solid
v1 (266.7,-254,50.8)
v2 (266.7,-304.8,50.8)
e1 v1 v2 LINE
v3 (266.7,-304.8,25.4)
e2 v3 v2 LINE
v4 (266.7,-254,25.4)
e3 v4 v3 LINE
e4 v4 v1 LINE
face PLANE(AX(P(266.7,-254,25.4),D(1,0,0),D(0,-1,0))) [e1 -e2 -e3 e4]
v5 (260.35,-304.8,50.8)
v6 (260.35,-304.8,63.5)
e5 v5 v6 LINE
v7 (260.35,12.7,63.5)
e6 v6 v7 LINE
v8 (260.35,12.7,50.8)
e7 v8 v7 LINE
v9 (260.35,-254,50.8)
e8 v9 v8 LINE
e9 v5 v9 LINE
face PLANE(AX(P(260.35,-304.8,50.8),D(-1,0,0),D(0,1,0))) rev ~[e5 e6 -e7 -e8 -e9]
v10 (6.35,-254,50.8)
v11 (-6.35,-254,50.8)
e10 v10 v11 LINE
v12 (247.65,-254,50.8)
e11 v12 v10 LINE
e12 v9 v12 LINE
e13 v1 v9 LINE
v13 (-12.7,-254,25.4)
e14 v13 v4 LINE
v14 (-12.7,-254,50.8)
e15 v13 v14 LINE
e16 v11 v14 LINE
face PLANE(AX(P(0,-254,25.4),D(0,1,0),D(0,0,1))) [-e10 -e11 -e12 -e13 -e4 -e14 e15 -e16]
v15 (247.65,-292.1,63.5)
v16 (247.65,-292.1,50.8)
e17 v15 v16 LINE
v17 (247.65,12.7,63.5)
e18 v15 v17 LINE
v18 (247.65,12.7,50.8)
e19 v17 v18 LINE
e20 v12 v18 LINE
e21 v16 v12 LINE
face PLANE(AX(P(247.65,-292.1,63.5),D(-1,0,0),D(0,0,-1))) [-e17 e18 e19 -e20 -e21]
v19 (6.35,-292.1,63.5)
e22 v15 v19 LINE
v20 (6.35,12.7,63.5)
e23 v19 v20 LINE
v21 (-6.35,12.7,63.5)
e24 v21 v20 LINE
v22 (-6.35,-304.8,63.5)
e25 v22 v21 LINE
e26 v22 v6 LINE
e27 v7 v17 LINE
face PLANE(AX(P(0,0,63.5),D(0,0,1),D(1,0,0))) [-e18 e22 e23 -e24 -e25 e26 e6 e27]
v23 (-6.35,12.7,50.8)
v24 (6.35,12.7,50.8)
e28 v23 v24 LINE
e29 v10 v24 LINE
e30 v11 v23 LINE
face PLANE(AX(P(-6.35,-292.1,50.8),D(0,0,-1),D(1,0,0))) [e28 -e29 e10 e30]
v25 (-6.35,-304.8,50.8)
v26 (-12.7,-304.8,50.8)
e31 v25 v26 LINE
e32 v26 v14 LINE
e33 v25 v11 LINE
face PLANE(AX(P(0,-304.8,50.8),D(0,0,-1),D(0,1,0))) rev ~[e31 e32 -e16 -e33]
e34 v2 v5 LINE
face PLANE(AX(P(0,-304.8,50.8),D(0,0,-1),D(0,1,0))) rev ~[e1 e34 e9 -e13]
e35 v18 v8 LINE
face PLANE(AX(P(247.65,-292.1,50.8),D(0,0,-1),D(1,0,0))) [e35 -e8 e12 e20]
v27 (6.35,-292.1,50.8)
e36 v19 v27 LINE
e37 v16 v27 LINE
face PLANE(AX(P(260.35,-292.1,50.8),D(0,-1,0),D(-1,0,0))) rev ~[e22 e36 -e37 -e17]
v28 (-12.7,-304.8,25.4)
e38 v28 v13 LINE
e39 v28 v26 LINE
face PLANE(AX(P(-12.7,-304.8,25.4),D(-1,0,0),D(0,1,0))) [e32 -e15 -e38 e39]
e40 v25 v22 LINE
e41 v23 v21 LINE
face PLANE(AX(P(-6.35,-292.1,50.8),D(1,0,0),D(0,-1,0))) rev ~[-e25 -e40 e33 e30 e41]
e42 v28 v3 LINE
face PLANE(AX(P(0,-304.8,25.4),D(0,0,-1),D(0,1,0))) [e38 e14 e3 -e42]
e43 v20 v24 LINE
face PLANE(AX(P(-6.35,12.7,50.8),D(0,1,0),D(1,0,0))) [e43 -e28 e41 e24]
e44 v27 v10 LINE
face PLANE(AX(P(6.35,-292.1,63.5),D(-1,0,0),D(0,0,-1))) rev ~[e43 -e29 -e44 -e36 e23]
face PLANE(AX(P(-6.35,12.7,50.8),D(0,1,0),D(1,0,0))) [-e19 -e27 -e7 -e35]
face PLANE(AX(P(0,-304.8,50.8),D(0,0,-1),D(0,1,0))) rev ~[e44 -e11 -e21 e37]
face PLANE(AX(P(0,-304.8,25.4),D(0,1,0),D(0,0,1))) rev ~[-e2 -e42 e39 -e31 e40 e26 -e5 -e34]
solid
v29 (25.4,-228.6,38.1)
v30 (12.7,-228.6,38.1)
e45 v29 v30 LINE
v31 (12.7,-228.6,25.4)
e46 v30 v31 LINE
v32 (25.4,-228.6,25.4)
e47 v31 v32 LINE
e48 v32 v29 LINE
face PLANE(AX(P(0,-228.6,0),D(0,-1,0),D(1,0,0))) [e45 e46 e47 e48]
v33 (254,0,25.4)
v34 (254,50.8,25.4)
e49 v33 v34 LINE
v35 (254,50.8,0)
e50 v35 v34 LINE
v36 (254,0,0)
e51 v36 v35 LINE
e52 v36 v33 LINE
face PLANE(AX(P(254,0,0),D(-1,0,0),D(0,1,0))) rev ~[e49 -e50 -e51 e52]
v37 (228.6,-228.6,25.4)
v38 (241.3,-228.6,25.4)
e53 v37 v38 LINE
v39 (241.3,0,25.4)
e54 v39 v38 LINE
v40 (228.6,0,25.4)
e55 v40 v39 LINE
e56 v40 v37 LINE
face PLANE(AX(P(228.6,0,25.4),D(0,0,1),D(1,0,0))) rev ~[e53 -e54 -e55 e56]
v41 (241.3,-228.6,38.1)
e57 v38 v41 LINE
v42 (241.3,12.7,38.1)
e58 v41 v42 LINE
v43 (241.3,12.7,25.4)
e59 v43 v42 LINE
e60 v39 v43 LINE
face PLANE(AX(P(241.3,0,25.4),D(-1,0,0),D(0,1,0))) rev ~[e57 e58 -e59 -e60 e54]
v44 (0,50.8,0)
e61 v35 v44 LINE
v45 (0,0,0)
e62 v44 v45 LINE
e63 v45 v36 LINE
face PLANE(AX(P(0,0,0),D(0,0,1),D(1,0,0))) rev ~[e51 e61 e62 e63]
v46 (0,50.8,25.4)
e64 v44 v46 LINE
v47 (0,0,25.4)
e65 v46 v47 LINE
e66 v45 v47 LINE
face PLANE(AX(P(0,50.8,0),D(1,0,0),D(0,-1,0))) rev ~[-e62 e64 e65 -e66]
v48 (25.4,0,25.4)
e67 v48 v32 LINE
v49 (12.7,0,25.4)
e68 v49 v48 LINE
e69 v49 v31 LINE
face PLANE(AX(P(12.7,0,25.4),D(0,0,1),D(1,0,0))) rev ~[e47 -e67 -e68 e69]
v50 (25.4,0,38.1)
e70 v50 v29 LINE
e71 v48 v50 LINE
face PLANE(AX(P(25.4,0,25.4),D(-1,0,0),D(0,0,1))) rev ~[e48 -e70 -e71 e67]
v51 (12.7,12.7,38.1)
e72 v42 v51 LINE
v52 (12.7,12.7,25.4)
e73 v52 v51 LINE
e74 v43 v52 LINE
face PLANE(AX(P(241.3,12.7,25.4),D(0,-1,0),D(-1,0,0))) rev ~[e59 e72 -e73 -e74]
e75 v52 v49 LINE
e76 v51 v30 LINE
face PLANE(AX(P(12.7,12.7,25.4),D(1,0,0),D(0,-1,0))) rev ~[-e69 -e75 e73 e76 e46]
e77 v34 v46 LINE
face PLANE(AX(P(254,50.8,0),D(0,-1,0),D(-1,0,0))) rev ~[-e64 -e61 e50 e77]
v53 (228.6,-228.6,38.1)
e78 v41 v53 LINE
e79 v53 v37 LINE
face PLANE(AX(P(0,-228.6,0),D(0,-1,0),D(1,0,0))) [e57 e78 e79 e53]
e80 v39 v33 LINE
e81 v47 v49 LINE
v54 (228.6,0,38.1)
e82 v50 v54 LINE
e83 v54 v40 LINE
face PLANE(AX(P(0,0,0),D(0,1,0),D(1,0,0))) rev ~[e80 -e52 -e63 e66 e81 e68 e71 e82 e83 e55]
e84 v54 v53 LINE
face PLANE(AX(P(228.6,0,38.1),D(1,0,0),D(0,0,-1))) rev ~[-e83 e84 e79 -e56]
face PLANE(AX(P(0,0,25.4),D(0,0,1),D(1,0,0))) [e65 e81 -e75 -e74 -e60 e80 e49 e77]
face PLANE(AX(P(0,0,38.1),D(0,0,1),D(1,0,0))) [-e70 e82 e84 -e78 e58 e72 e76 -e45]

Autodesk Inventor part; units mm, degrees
ref_plane "YZ Plane" through (0, 0, 0) normal (1, 0, 0) x (0, 1, 0)
ref_plane "XZ Plane" through (0, 0, 0) normal (0, 1, 0) x (-1, 0, 0)
ref_plane "XY Plane" through (0, 0, 0) normal (0, 0, 1) x (1, 0, 0)
sketch "Sketch1" plane through (0, 0, 0) normal (0, 0, 1) x (1, 0, 0)
  line L0 (0, 0) -> (254, 0)
  line L1 (254, 0) -> (254, 50.8)
  line L2 (254, 50.8) -> (0, 50.8)
  line L3 (0, 50.8) -> (0, 0)
  dimension "d0" = 254
  dimension "d1" = 50.8
extrude "Extrusion1" add sketch "Sketch1" along normal blind 25.4
sketch "Sketch2" plane through (0, 0, 25.4) normal (0, 0, 1) x (1, 0, 0)
  line L0 (0, 0) -> (254, 0) projected
  line L1 (0, 50.8) -> (0, 0) projected
  line L2 (0, -254) -> (254, -254)
  line L3 (254, -254) -> (254, -304.8)
  line L4 (254, -304.8) -> (0, -304.8)
  line L5 (0, -304.8) -> (0, -254)
  dimension "d4" = 254
  dimension "d5" = 0
  dimension "d6" = 50.8
extrude "Extrusion2" add sketch "Sketch2" along normal blind 25.4
sketch "Sketch3" plane through (0, 0, 25.4) normal (0, 0, 1) x (1, 0, 0)
  line L0 (0, 0) -> (254, 0) projected
  line L1 (12.7, 0) -> (241.3, 0)
  line L2 (241.3, 0) -> (241.3, 12.7)
  line L3 (241.3, 12.7) -> (12.7, 12.7)
  line L4 (12.7, 12.7) -> (12.7, 0)
  dimension "d9" = 12.7
extrude "Extrusion3" add sketch "Sketch3" along normal blind 12.7
thicken "Thicken1" operation add thickness 12.7 both sides no extend neighbours yes toward (1, 0, 0) faces at (254, -270.9333, 33.8667)
thicken "Thicken2" operation add thickness 12.7 both sides no extend neighbours yes toward (-1, 0, 0) faces at (0, -287.8667, 33.8667)
sketch "Sketch4" plane through (0, 0, 50.8) normal (0, 0, 1) x (1, 0, 0)
  point P0 (0, 0)
sketch "Sketch5" plane through (0, 0, 50.8) normal (0, 0, 1) x (1, 0, 0)
  point P0 (0, 0)
sketch "Sketch6" plane through (0, 0, 50.8) normal (0, 0, 1) x (1, 0, 0)
  point P0 (0, 0)
sketch "Sketch7" plane through (0, 0, 50.8) normal (0, 0, 1) x (1, 0, 0)
  line L0 (-12.7, -304.8) -> (266.7, -304.8) projected
  line L1 (-6.35, -304.8) -> (260.35, -304.8)
  line L2 (260.35, -304.8) -> (260.35, -292.1)
  line L3 (260.35, -292.1) -> (-6.35, -292.1)
  line L4 (-6.35, -292.1) -> (-6.35, -304.8)
  point P0 (0, 0)
  dimension "d16" = 12.7
extrude "Extrusion4" add sketch "Sketch7" along normal blind 12.7
sketch "Sketch8" plane through (-6.35, -292.1, 50.8) normal (0, 1, 0) x (1, 0, 0)
  line L0 (0, 0) -> (0, -12.7) projected
  line L1 (0, 0) -> (266.7, 0) projected
  line L2 (0, -12.7) -> (12.7, -12.7)
  line L3 (12.7, -12.7) -> (12.7, 0)
  line L4 (12.7, 0) -> (0, 0)
  line L5 (0, 0) -> (0, -12.7)
  line L6 (266.7, 0) -> (266.7, -12.7) projected
  line L7 (266.7, -12.7) -> (254, -12.7)
  line L8 (254, -12.7) -> (254, 0)
  line L9 (254, 0) -> (266.7, 0)
  line L10 (266.7, 0) -> (266.7, -12.7)
  point P0 (6.35, 50.8)
  dimension "d19" = 12.7
  dimension "d20" = 12.7
extrude "Extrusion5" add sketch "Sketch8" along normal blind 304.8
sketch "Sketch9" plane through (0, 0, 0) normal (0, -1, 0) x (1, 0, 0)
  line L0 (0, 25.4) -> (12.7, 25.4) projected
  line L1 (241.3, 38.1) -> (12.7, 38.1) projected
  line L2 (12.7, 25.4) -> (25.4, 25.4)
  line L3 (25.4, 25.4) -> (25.4, 38.1)
  line L4 (25.4, 38.1) -> (12.7, 38.1)
  line L5 (12.7, 38.1) -> (12.7, 25.4)
  line L6 (241.3, 25.4) -> (241.3, 38.1) projected
  line L7 (241.3, 38.1) -> (228.6, 38.1)
  line L8 (228.6, 38.1) -> (228.6, 25.4)
  line L9 (228.6, 25.4) -> (241.3, 25.4)
  line L10 (241.3, 25.4) -> (241.3, 38.1)
  point P0 (0, 0)
  dimension "d23" = 12.7
  dimension "d24" = 12.7
  dimension "d25" = 12.7
extrude "Extrusion6" add sketch "Sketch9" along normal blind 228.6
properties part number "Foldedcapballliftholders"
